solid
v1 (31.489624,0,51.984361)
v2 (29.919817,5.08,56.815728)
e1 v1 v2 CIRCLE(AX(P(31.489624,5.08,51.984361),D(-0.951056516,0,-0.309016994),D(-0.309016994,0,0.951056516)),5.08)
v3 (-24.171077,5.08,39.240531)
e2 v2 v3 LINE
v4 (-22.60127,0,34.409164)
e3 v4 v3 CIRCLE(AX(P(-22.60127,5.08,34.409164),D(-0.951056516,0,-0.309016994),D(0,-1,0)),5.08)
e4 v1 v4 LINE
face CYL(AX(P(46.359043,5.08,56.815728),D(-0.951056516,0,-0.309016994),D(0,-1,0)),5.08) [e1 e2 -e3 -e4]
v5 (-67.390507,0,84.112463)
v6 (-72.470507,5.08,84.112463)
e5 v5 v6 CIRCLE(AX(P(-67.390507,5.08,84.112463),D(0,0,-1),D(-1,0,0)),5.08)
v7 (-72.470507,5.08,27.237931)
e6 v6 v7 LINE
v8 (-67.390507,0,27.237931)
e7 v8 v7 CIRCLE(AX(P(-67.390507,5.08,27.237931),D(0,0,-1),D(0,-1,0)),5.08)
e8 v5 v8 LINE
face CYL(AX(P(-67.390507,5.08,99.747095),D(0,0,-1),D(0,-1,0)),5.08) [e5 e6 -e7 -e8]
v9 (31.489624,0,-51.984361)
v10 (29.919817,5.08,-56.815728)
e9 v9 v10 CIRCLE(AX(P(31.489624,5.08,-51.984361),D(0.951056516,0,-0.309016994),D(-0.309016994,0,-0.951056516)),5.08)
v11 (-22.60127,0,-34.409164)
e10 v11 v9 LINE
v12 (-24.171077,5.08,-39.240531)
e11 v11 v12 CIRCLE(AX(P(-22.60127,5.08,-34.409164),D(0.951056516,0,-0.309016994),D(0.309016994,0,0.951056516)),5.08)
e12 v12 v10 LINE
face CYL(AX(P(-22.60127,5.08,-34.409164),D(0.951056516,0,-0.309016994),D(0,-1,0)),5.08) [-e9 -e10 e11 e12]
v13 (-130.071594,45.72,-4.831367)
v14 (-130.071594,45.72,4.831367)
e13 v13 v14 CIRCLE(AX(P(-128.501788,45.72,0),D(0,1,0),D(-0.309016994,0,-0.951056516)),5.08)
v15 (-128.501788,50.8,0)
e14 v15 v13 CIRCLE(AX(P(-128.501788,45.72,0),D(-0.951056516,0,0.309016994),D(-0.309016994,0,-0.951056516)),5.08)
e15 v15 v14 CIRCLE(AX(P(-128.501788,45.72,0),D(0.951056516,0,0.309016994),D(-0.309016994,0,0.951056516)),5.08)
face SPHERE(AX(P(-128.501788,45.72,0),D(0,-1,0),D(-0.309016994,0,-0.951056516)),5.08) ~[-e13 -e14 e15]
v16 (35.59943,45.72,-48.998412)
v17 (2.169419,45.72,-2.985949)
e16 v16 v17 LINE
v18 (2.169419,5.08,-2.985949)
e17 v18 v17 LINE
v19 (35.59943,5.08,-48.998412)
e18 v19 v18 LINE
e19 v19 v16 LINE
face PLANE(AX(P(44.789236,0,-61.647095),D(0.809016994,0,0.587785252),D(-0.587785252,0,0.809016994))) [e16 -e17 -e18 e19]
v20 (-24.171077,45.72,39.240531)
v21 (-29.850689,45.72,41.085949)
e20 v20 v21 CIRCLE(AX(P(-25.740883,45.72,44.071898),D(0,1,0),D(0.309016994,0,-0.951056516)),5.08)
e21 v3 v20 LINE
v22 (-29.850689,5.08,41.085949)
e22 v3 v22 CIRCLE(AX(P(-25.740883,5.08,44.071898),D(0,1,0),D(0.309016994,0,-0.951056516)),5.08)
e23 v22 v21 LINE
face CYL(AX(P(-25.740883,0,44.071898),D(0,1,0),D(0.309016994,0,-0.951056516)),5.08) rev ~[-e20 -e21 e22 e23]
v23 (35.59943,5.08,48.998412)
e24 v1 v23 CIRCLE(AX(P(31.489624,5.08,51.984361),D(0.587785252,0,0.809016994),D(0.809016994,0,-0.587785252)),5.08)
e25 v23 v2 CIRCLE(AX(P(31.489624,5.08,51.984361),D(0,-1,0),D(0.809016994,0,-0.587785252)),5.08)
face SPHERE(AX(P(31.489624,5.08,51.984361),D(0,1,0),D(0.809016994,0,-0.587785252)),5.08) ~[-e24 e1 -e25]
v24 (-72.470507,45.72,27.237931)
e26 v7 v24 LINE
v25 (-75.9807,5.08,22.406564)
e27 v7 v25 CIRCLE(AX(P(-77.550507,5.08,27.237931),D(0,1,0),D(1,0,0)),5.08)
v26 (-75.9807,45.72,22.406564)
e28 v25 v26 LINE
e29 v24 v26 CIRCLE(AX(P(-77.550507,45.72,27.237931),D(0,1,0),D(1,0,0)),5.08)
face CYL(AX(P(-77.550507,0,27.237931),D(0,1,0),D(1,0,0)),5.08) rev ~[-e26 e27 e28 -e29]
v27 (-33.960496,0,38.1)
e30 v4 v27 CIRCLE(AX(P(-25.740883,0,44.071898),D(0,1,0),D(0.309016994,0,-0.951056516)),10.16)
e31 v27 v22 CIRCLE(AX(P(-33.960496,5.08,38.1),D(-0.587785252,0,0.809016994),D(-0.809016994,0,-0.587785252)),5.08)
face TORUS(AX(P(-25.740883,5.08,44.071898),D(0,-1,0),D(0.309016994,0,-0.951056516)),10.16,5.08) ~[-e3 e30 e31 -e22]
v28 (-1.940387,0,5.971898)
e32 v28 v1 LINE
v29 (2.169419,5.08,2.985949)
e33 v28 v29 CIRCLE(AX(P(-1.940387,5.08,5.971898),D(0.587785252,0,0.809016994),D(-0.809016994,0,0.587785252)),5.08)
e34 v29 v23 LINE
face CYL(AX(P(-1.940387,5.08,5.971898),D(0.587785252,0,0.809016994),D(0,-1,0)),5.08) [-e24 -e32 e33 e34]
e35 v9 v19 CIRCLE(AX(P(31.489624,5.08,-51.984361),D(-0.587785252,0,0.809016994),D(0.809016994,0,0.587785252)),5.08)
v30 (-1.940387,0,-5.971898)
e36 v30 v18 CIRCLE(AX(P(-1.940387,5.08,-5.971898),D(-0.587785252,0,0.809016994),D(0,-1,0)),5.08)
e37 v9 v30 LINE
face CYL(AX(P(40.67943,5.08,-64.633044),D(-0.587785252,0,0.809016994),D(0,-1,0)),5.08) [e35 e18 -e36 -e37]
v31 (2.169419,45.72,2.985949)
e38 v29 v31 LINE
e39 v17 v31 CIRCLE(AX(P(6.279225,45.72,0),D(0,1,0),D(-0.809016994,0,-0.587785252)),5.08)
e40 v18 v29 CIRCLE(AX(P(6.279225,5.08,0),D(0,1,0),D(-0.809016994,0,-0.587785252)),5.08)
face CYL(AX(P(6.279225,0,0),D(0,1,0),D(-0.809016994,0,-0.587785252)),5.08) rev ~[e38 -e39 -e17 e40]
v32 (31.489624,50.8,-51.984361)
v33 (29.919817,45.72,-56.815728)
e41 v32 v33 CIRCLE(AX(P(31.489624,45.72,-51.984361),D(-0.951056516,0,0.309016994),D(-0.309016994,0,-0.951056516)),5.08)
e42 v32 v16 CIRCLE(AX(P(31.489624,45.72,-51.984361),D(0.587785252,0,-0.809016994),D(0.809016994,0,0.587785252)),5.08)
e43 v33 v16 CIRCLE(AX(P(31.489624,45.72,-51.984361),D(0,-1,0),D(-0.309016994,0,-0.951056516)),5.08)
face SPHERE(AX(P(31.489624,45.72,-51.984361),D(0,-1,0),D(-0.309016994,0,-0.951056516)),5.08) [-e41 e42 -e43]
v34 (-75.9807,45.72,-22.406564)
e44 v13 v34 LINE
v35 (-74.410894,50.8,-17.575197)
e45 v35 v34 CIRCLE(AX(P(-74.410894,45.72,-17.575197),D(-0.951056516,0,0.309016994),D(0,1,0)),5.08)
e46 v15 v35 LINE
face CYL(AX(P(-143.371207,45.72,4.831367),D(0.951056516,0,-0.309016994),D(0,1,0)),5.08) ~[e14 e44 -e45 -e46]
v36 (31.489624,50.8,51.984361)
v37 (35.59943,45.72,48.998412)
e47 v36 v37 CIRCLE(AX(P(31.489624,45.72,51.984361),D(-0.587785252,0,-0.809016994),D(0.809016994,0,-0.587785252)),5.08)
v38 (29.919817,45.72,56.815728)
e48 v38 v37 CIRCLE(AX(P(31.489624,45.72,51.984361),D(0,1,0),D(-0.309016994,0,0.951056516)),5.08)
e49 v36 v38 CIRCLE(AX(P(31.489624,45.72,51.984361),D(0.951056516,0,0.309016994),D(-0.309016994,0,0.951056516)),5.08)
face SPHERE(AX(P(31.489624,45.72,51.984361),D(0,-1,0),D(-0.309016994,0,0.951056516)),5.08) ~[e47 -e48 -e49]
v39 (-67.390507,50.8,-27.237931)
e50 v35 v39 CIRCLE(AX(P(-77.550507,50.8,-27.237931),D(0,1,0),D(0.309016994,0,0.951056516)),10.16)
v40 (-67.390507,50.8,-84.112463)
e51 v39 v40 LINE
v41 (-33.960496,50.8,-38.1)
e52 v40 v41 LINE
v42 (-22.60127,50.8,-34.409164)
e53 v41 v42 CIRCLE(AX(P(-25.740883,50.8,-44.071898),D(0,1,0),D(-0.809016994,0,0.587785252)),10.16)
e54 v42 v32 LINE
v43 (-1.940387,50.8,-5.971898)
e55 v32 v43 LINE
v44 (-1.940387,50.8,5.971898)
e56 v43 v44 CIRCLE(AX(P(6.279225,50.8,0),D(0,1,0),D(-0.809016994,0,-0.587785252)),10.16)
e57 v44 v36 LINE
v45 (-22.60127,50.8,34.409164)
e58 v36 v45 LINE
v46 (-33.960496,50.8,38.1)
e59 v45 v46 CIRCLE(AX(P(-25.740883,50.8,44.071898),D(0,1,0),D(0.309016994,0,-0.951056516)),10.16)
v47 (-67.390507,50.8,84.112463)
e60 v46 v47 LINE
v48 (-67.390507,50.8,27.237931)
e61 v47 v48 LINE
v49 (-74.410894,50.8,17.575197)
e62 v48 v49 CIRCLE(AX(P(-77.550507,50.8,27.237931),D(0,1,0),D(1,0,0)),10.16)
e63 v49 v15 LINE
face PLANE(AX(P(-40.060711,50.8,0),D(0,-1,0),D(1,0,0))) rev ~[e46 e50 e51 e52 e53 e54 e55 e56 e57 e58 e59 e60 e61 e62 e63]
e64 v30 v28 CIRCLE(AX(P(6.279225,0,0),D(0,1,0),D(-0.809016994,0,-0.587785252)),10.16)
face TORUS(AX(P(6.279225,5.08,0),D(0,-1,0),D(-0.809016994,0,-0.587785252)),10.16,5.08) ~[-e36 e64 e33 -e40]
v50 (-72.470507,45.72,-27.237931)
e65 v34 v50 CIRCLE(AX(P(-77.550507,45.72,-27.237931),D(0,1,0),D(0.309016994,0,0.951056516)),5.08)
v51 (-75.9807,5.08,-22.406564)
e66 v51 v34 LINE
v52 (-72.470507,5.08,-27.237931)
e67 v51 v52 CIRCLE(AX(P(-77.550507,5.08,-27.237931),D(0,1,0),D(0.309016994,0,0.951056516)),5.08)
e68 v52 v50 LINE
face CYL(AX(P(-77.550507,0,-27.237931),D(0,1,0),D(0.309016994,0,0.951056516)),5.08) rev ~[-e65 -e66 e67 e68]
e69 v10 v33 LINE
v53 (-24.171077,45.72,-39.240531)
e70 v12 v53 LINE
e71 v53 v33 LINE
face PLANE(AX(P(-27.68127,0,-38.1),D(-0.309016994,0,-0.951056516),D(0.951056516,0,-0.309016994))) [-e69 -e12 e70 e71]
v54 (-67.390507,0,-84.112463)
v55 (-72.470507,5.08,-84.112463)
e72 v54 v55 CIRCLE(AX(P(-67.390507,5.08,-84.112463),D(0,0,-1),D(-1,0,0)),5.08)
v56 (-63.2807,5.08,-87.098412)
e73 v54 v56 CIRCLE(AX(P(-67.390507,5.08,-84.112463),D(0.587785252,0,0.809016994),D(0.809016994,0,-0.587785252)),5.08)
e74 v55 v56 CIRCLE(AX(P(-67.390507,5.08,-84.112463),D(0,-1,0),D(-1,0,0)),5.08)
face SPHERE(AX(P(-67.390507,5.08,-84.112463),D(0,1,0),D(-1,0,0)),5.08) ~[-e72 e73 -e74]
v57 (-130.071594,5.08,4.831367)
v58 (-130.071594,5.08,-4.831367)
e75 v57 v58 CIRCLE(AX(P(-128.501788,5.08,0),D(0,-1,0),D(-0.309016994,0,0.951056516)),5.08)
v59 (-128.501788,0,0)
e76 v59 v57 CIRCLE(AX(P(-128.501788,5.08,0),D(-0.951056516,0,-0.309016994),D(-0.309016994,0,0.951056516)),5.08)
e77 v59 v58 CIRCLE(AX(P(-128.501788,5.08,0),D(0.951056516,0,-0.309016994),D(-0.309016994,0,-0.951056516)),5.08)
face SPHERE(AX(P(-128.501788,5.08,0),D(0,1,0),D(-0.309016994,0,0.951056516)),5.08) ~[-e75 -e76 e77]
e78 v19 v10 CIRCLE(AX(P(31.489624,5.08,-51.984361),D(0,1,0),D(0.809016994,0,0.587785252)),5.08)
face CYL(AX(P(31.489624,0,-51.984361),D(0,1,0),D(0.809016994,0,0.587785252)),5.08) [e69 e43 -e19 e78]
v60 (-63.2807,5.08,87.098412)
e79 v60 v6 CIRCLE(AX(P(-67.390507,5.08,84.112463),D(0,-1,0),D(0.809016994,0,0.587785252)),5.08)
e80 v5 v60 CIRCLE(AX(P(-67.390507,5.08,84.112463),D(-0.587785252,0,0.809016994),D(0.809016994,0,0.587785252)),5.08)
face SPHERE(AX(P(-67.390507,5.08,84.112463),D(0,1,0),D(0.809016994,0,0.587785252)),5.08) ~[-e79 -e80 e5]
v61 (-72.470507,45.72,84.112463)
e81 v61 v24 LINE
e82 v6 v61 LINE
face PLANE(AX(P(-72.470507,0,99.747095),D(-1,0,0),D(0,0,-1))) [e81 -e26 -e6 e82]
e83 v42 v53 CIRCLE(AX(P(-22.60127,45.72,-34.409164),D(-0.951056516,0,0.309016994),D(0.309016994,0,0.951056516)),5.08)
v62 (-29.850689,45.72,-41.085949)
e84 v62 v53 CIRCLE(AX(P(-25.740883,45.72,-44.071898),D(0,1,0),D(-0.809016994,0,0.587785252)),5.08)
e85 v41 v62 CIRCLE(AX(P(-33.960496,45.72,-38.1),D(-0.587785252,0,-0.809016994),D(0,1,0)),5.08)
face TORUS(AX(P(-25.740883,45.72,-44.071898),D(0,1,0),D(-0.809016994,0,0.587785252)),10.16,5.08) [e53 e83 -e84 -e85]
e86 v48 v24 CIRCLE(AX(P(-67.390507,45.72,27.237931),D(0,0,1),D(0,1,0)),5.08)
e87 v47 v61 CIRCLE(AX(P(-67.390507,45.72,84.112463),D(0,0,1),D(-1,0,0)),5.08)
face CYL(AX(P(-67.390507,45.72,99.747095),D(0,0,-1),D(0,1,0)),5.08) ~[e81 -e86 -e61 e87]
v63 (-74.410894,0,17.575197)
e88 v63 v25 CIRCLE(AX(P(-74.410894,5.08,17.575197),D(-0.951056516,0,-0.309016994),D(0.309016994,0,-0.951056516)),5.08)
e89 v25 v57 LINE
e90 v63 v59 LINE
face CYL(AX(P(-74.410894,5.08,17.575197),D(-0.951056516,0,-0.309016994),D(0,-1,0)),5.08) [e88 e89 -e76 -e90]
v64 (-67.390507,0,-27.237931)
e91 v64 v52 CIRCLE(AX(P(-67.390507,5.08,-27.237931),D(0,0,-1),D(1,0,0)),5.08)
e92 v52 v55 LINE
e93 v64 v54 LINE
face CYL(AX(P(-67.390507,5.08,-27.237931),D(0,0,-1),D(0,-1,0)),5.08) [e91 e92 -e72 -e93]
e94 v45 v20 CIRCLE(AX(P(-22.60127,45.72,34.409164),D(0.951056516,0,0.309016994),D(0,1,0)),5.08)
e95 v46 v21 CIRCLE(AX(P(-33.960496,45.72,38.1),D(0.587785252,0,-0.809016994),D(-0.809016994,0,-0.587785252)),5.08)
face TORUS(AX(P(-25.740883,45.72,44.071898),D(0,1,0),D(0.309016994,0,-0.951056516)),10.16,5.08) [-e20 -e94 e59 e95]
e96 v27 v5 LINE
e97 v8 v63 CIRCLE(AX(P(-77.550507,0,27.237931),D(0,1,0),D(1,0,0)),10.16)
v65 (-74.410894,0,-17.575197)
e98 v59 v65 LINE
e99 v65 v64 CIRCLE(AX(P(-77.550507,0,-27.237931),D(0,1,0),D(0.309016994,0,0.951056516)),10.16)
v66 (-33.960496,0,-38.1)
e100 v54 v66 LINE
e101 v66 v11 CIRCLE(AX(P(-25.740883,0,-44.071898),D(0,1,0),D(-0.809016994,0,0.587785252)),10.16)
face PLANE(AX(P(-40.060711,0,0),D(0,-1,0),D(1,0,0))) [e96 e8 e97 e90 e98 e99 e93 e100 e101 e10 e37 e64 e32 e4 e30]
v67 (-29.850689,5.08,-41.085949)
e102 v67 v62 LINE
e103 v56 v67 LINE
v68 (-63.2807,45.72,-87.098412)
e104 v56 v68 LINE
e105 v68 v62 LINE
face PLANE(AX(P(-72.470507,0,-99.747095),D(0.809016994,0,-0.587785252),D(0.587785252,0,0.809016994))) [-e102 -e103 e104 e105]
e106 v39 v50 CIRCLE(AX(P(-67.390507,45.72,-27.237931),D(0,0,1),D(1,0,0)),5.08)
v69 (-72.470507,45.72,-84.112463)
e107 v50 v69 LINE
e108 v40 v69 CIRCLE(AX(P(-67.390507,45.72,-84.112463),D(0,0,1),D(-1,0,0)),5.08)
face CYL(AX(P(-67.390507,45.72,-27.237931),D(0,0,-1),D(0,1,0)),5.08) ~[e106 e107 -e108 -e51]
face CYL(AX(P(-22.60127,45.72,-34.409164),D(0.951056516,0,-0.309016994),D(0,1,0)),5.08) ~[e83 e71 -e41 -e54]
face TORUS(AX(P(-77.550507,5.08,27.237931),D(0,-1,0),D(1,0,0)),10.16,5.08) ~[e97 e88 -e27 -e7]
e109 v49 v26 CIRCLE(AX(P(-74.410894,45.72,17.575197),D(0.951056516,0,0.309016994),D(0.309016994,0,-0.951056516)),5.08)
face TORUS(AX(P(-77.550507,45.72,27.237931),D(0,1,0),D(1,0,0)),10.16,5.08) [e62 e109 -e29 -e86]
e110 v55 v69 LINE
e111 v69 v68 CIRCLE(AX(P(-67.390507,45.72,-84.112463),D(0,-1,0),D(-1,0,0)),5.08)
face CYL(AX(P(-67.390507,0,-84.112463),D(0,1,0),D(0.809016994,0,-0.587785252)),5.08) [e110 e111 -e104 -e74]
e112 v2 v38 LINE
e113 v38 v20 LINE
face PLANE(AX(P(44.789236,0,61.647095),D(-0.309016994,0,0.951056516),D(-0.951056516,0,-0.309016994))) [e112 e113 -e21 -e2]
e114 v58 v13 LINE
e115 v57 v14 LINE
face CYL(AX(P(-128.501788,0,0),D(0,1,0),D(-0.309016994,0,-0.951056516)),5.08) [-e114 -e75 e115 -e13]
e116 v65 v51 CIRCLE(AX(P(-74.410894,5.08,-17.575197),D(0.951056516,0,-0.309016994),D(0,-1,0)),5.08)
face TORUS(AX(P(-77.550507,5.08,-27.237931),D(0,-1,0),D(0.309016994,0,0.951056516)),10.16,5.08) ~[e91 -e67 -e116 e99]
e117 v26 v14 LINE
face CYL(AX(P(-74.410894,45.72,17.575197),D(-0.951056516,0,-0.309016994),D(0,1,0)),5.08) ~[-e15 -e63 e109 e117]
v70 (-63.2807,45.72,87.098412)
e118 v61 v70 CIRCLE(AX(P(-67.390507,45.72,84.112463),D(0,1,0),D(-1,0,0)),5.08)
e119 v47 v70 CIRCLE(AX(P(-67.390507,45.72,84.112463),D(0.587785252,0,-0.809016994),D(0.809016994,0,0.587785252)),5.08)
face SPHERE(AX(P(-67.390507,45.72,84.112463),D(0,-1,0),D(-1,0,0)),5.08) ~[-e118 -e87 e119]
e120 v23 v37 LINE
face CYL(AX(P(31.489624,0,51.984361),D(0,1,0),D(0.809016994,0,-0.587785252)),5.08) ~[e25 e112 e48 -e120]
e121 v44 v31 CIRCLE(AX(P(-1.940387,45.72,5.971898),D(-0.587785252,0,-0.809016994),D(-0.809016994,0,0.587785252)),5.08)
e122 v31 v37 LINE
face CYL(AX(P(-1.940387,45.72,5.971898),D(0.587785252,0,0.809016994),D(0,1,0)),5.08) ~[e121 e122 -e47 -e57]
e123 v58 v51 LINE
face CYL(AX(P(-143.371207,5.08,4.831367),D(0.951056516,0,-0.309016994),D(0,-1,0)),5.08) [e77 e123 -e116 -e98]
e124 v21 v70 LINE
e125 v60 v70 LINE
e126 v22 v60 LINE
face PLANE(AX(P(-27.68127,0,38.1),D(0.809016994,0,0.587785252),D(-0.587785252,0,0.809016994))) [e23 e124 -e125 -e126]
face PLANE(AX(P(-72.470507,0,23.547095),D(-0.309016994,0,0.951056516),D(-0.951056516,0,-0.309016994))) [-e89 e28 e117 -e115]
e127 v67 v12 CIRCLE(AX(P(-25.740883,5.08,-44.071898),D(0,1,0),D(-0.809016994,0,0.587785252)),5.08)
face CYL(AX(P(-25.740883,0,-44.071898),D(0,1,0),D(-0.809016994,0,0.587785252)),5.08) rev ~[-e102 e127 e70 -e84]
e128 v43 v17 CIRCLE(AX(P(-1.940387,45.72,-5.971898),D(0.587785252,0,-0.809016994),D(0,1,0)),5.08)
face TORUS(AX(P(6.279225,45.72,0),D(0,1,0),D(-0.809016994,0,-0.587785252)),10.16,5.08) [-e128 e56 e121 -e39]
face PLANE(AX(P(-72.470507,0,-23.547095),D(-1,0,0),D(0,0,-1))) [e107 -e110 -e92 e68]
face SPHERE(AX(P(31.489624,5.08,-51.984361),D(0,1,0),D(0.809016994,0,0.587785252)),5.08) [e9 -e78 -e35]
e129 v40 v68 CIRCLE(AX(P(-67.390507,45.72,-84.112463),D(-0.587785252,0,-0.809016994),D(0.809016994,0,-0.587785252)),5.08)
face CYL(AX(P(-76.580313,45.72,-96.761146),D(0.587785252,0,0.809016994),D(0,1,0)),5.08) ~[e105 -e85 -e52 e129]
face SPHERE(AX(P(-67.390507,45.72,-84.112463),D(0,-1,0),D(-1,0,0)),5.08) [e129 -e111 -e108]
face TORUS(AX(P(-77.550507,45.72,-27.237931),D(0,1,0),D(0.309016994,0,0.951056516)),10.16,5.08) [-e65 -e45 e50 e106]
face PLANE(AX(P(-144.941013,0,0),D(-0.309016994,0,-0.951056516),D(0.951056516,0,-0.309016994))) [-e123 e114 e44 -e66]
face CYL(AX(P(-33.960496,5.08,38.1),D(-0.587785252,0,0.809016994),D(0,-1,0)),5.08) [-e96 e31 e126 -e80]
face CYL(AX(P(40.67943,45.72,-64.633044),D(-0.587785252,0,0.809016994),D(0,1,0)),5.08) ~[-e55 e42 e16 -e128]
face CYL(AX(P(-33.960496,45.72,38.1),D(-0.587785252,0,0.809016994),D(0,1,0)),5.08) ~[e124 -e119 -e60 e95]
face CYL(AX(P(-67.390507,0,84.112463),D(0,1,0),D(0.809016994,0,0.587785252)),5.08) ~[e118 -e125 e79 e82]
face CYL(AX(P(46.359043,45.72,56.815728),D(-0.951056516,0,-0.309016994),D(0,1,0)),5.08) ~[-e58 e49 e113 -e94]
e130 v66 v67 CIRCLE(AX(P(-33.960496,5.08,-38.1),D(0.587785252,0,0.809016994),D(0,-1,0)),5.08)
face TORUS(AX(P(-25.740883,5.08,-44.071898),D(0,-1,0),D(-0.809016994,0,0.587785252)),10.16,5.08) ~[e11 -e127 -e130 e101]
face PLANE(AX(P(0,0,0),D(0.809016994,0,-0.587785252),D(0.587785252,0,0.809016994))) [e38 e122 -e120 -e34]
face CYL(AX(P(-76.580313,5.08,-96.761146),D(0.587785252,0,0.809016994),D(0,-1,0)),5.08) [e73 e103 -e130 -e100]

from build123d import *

# Parameters (mm, degrees)
F1_DEPTH = 50.8
F2_F1_R  = 5.08
F2_F2_R  = 5.08


with BuildPart() as f1:
    # F0 (on Front) → F1 (new body)
    with BuildSketch(Plane.XZ):
        Polygon((44.7892362247, -61.6470949714), (0, 0), (44.7892362247, 61.6470949714), (-27.681270317, 38.1), (-72.4705065417, 99.7470949714), (-72.4705065417, 23.5470949714), (-144.9410130834, 0), (-72.4705065417, -23.5470949714), (-72.4705065417, -99.7470949714), (-27.681270317, -38.1), align=None)
    extrude(amount=-F1_DEPTH)

    # F2: fillet of radius 5.08 on 21 edges, made by hand

    # F2_f1
    f2_f1_edges = [f1.edges().sort_by_distance(p)[0] for p in [
        (-27.681270317, 25.4, -38.1),
        (-72.4705065417, 25.4, -23.5470949714),
        (-72.4705065417, 25.4, 23.5470949714),
        (-27.681270317, 25.4, 38.1),
        (0, 25.4, 0),
    ]]
    fillet(f2_f1_edges, radius=F2_F1_R)

    # F2_f2
    f2_f2_edges = [f1.edges().sort_by_distance(p)[0] for p in [
        (-72.4705065417, 25.4, 99.7470949714),
        (-144.9410130834, 25.4, 0),
        (44.7892362247, 25.4, 61.6470949714),
        (44.7892362247, 25.4, -61.6470949714),
        (-72.4705065417, 25.4, -99.7470949714),
        (-72.4705065417, 50.8, -63.4925129925),
        (-51.1605979265, 50.8, -70.4165220265),
        (10.3090797881, 50.8, -50.4438130159),
        (-110.4608566468, 50.8, 11.2032819554),
        (-51.1605979265, 50.8, 70.4165220265),
        (23.4793276095, 50.8, 32.3165220265),
        (23.4793276095, 0, 32.3165220265),
        (10.3090797881, 0, 50.4438130159),
        (-72.4705065417, 0, 63.4925129925),
        (-110.4608566468, 0, -11.2032819554),
        (-51.1605979265, 0, -70.4165220265),
        (-27.3106893113, 0, -39.2405310605),
        (-73.4407002103, 0, -24.251981932),
        (-73.4407002103, 0, 24.251981932),
        (-27.3106893113, 0, 39.2405310605),
        (1.1992253257, 0, 0),
        (1.1992253257, 50.8, 0),
        (-27.3106893113, 50.8, 39.2405310605),
        (-73.4407002103, 50.8, 24.251981932),
        (-27.3106893113, 50.8, -39.2405310605),
        (-73.4407002103, 50.8, -24.251981932),
    ]]
    fillet(f2_f2_edges, radius=F2_F2_R)


solid = f1.part
